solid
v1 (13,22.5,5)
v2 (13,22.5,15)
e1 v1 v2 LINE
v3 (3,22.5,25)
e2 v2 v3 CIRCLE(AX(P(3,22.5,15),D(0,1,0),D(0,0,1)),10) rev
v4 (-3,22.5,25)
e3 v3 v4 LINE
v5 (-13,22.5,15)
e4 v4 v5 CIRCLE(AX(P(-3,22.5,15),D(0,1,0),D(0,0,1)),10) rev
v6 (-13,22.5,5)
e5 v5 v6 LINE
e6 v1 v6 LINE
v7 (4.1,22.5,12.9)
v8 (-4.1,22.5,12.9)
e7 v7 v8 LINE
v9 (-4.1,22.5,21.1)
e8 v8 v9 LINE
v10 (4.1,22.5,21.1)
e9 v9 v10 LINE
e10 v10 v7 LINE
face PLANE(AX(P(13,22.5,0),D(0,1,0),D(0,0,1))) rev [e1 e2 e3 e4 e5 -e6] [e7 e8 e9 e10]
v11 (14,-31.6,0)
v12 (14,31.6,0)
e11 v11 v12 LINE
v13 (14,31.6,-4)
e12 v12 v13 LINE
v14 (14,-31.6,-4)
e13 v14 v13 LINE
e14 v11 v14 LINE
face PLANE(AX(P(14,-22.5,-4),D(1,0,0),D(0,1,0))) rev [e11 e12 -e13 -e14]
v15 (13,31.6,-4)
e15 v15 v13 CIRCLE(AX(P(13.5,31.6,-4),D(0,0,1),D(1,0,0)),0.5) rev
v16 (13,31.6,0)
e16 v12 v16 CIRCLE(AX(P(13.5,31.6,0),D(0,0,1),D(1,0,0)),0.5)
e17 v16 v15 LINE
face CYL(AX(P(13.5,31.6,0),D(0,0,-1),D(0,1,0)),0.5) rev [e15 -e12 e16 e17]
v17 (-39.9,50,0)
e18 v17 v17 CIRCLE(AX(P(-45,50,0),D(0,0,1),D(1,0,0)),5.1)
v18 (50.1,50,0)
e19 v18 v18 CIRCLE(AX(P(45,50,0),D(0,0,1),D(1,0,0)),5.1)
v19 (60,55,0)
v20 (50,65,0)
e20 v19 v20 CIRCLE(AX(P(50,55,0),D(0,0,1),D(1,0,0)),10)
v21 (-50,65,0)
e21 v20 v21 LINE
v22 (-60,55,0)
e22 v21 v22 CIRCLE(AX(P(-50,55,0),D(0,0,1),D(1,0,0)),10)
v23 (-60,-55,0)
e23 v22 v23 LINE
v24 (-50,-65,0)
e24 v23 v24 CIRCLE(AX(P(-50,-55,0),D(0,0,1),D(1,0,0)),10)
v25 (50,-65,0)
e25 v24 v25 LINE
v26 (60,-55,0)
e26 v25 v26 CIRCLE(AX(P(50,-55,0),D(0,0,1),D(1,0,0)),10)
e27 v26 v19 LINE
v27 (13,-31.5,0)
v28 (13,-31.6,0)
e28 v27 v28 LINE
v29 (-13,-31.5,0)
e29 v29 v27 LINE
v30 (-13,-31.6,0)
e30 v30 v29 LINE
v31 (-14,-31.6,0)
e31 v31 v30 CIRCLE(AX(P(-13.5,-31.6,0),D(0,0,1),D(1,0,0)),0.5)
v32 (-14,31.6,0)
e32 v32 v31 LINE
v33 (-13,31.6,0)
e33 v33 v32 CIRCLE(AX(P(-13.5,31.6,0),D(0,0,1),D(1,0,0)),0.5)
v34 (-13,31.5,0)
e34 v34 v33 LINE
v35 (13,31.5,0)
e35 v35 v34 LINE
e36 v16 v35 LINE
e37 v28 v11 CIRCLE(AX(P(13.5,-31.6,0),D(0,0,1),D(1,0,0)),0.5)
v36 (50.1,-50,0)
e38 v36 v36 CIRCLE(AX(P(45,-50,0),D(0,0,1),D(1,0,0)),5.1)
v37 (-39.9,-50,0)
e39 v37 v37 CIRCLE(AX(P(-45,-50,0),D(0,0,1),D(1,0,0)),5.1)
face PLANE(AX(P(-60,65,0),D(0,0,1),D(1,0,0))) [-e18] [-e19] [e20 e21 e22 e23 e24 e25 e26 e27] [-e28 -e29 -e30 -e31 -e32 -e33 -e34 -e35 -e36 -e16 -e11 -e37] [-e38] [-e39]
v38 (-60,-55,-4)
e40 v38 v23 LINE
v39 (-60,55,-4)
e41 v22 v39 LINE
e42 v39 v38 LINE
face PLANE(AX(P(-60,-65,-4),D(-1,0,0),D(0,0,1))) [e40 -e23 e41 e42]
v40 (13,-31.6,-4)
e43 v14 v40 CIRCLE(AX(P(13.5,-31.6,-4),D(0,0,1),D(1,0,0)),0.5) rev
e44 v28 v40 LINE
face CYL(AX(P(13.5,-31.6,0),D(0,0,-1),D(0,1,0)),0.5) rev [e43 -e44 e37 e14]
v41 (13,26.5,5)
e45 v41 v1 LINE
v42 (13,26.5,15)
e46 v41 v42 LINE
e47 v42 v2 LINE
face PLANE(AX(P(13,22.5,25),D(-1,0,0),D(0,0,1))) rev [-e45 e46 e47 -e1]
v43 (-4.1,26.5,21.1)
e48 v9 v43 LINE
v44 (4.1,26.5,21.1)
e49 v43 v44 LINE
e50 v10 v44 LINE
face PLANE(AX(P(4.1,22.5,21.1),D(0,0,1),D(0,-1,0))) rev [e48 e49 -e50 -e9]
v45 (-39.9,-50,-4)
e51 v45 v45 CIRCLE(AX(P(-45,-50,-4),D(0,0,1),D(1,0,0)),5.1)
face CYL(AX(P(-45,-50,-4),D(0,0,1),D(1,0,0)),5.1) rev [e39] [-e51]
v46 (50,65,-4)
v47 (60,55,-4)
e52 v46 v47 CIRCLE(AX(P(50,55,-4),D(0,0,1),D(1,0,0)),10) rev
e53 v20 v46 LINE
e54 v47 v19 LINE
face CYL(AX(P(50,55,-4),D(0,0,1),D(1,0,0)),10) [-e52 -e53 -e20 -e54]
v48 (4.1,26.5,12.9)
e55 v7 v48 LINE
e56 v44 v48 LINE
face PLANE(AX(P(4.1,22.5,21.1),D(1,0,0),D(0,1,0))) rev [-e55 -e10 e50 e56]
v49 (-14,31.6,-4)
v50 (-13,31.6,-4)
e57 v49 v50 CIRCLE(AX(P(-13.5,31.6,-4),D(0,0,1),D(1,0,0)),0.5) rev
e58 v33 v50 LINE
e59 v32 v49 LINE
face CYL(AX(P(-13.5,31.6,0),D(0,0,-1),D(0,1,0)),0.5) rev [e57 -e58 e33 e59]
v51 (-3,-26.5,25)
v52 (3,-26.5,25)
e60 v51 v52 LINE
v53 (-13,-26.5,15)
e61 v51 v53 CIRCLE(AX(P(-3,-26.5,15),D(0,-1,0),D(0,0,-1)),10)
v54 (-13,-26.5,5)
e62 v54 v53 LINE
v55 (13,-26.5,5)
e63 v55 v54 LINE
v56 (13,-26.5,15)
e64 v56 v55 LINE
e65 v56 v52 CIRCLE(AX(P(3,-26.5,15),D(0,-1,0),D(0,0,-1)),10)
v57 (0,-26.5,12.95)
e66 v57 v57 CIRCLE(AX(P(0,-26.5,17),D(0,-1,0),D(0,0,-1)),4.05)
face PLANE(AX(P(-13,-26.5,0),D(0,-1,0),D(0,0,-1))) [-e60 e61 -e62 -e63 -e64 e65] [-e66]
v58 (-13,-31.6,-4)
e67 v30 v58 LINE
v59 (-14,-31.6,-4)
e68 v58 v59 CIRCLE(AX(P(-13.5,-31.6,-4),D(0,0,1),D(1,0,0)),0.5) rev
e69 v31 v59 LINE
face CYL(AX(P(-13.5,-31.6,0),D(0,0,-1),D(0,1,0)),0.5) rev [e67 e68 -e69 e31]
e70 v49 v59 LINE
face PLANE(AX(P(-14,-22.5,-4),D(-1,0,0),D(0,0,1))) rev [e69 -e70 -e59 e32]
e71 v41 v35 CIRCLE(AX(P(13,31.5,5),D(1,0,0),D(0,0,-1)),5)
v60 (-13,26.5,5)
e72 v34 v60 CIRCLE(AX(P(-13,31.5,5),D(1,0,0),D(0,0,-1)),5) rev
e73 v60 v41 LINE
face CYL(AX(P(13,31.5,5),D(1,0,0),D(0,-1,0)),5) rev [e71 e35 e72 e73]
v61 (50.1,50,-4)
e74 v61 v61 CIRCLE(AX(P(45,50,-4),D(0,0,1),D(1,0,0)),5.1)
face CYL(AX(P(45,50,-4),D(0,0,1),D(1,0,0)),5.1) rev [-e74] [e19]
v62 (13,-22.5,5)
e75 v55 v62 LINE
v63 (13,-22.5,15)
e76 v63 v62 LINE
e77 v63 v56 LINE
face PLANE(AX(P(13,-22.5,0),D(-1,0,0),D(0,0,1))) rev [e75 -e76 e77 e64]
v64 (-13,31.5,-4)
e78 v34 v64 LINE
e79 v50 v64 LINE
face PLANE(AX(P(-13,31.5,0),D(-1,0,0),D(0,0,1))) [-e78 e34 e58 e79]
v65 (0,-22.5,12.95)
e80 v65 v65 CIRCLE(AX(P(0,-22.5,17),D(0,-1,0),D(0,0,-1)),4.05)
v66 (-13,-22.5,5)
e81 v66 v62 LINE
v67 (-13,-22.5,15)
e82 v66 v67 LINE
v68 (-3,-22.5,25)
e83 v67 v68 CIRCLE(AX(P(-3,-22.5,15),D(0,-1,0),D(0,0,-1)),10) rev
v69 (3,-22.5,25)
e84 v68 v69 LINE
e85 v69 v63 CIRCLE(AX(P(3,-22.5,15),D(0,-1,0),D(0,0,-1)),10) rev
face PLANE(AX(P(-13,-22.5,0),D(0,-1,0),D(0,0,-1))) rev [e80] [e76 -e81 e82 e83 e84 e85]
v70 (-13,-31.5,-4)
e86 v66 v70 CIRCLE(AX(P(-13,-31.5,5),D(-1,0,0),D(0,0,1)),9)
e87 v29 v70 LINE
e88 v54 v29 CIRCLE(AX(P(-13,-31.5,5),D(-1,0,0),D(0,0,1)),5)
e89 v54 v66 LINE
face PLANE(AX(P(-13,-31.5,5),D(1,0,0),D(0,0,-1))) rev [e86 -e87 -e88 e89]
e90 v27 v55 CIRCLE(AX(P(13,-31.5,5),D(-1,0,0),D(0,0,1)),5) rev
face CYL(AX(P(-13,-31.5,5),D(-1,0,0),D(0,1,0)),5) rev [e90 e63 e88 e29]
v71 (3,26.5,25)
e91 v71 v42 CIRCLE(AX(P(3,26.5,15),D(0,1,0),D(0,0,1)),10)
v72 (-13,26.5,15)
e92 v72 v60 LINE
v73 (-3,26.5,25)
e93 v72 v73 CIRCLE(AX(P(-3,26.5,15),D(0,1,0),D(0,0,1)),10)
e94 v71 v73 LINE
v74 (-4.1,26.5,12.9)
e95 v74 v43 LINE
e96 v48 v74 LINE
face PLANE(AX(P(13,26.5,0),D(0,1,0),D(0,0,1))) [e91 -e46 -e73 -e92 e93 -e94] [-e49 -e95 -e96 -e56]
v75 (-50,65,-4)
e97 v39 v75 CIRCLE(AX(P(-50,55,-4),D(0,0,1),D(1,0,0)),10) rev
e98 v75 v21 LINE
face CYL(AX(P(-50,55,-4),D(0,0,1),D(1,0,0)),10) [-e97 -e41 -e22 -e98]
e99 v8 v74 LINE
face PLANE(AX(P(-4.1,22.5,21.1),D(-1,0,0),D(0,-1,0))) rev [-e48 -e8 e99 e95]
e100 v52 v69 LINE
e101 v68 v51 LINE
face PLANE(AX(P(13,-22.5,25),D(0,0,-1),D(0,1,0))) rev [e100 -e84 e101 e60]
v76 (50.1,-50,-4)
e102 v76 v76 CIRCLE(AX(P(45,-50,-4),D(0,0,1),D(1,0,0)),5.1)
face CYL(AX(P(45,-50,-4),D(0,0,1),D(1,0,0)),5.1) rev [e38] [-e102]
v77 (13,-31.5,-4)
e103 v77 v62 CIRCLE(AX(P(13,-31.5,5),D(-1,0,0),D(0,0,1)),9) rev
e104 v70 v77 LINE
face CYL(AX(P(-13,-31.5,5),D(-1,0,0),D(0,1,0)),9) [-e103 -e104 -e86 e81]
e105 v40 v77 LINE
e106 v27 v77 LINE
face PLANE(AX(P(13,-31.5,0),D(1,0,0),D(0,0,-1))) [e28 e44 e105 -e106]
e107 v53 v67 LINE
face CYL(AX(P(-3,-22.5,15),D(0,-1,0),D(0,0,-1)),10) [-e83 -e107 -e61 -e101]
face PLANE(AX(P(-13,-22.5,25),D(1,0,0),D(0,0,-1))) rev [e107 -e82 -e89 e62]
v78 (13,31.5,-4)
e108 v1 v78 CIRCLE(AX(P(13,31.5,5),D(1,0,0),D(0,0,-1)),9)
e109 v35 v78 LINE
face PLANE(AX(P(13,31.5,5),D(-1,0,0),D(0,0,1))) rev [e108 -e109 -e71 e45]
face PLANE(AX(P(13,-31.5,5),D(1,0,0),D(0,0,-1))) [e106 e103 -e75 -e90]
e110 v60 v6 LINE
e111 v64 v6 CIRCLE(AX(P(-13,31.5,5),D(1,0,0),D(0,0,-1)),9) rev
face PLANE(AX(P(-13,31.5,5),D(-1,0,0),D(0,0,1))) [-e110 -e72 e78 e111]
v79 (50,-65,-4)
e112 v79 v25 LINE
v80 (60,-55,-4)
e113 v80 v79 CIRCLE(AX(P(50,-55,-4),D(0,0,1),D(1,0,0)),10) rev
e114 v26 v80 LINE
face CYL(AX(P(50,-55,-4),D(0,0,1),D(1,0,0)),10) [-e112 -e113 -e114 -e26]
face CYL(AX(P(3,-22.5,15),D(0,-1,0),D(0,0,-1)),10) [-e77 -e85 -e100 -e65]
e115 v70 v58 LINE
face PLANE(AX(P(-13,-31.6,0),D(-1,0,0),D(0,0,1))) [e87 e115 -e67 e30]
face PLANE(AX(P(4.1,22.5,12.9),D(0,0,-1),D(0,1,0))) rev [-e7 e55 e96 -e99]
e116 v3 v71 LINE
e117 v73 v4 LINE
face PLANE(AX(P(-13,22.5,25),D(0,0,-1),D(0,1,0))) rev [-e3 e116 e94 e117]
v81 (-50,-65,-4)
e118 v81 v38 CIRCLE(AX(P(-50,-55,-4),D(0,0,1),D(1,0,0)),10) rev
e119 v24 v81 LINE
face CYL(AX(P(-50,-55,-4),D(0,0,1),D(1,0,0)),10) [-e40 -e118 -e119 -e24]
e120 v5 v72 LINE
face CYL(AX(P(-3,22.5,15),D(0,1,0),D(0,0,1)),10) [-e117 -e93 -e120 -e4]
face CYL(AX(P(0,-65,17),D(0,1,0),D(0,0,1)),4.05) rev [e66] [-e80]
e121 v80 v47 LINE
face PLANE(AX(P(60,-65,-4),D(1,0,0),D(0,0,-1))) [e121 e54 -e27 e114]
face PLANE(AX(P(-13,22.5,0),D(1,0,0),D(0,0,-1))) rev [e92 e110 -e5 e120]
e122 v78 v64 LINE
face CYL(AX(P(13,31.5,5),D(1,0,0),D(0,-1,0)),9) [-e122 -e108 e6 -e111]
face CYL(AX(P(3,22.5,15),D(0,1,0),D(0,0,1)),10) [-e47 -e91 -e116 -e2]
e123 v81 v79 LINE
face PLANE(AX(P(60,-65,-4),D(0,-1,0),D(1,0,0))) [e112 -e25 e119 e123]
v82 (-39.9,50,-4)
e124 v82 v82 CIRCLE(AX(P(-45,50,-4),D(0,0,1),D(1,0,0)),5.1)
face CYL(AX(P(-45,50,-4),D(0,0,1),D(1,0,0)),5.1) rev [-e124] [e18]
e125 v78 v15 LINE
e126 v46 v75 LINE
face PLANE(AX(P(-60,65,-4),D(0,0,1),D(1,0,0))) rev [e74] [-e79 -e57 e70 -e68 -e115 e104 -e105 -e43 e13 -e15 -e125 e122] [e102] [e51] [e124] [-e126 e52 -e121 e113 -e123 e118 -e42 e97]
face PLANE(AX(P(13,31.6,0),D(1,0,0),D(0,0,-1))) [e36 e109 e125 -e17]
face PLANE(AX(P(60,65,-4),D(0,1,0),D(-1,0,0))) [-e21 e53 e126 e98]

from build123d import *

# Parameters (mm, degrees)
SKETCH_1_W                   = 120
SKETCH_1_H                   = 130
SKETCH_1_W_2                 = 28
SKETCH_1_H_2                 = 45
SM_BASE_FLANGE_1_DEPTH       = 4
SM_START                     = -4
SM_EDGE_FLANGE_1_DEPTH       = 4
SM_EDGE_FLANGE_1_2_OUTLINE_W = 26
SM_EDGE_FLANGE_1_2_OUTLINE_H = 4
SM_EDGE_FLANGE_1_2_DEPTH     = 0.41096
SM_START_2                   = 5
SM_EDGE_FLANGE_1_3_OUTLINE_W = 26
SM_EDGE_FLANGE_1_3_OUTLINE_H = 4
SM_EDGE_FLANGE_1_3_DEPTH     = 20
SM_START_3                   = -13
SM_EDGE_FLANGE_1_4_DEPTH     = 26
SM_EDGE_FLANGE_1_5_DEPTH     = 26
CUT_EXTRUDE_1_DEPTH          = 92.923881554
CUT_EXTRUDE_1_DEPTH_BACK     = 92.923881554
SKETCH_10_R                  = 4.05
SKETCH_12_W                  = 8.2
SKETCH_12_H                  = 8.2
CUT_EXTRUDE_3_DEPTH          = 4
FILLET_1_R                   = 10
SKETCH_11_R                  = 5.1
CUT_EXTRUDE_2_DEPTH          = 4


with BuildPart() as part:
    # Базовая кромка1: sheet metal written as solids
    # Sketch 1 → Базовая кромка1 (new body)
    with BuildSketch(Plane.XY):
        Rectangle(SKETCH_1_W, SKETCH_1_H)
        Rectangle(SKETCH_1_W_2, SKETCH_1_H_2, mode=Mode.SUBTRACT)
    extrude(amount=-SM_BASE_FLANGE_1_DEPTH)

    # Ребро-кромка1: read off the stored shape, not the designer's step
    # Ребро-кромка1 outline → Ребро-кромка1 (cut)
    with BuildSketch(Plane.XY.offset(SM_START)):
        with BuildLine():
            ThreePointArc((-13, 31.6), (-13.5, 32.1), (-14, 31.6))
            Line((-14, 31.6), (-14, 22.5))
            Line((-14, 22.5), (-13, 22.5))
            Line((-13, 22.5), (-13, 31.6))
        make_face()
        with BuildLine():
            Line((-13, -22.5), (-14, -22.5))
            Line((-14, -22.5), (-14, -31.6))
            ThreePointArc((-14, -31.6), (-13.5, -32.1), (-13, -31.6))
            Line((-13, -31.6), (-13, -22.5))
        make_face()
        with BuildLine():
            Line((13, 31.6), (13, 22.5))
            Line((13, 22.5), (14, 22.5))
            Line((14, 22.5), (14, 31.6))
            ThreePointArc((14, 31.6), (13.5, 32.1), (13, 31.6))
        make_face()
        with BuildLine():
            Line((14, -22.5), (13, -22.5))
            Line((13, -22.5), (13, -31.6))
            ThreePointArc((13, -31.6), (13.5, -32.1), (14, -31.6))
            Line((14, -31.6), (14, -22.5))
        make_face()
    extrude(amount=SM_EDGE_FLANGE_1_DEPTH, mode=Mode.SUBTRACT)

    # Sm Edge Flange 1 2 outline → Sm Edge Flange 1 2 (cut)
    with BuildSketch(Plane.XY.offset(SM_START)):
        with Locations((0, 24.5)):
            Rectangle(SM_EDGE_FLANGE_1_2_OUTLINE_W, SM_EDGE_FLANGE_1_2_OUTLINE_H)
        with Locations((0, -24.5)):
            Rectangle(SM_EDGE_FLANGE_1_2_OUTLINE_W, SM_EDGE_FLANGE_1_2_OUTLINE_H)
    extrude(amount=SM_EDGE_FLANGE_1_2_DEPTH, mode=Mode.SUBTRACT)

    # Sm Edge Flange 1 4 outline → Sm Edge Flange 1 4 (cut)
    with BuildSketch(Plane.YZ.offset(SM_START_3)):
        with BuildLine():
            ThreePointArc((31.5, -4), (27.257359313, -2.937253933), (24.016685226, 0))
            Line((24.016685226, 0), (22.5, 0))
            Line((22.5, 0), (22.5, -3.58904))
            Line((22.5, -3.58904), (26.5, -3.58904))
            Line((26.5, -3.58904), (26.5, -4))
            Line((26.5, -4), (31.5, -4))
        make_face()
        with BuildLine():
            Line((-22.5, -3.58904), (-22.5, 0))
            Line((-22.5, 0), (-24.016685226, 0))
            ThreePointArc((-24.016685226, 0), (-27.257359313, -2.937253933), (-31.5, -4))
            Line((-31.5, -4), (-26.5, -4))
            Line((-26.5, -4), (-26.5, -3.58904))
            Line((-26.5, -3.58904), (-22.5, -3.58904))
        make_face()
    extrude(amount=SM_EDGE_FLANGE_1_4_DEPTH, mode=Mode.SUBTRACT)



with BuildPart() as body_2:
    # Sm Edge Flange 1 3 outline → Sm Edge Flange 1 3 (new body)
    with BuildSketch(Plane.XY.offset(SM_START_2)):
        with Locations((0, 24.5)):
            Rectangle(SM_EDGE_FLANGE_1_3_OUTLINE_W, SM_EDGE_FLANGE_1_3_OUTLINE_H)
        with Locations((0, -24.5)):
            Rectangle(SM_EDGE_FLANGE_1_3_OUTLINE_W, SM_EDGE_FLANGE_1_3_OUTLINE_H)
    extrude(amount=SM_EDGE_FLANGE_1_3_DEPTH)


with BuildPart() as part_1:
    add(part.part)

    add(body_2.part)  # Sm Edge Flange 1 5 merges body 2
    # Sm Edge Flange 1 5 outline → Sm Edge Flange 1 5 (add)
    with BuildSketch(Plane.YZ.offset(SM_START_3)):
        with BuildLine():
            Line((26.5, 5), (22.5, 5))
            ThreePointArc((22.5, 5), (22.88751392, 2.38751392), (24.016685226, 0))
            Line((24.016685226, 0), (31.5, 0))
            ThreePointArc((31.5, 0), (27.964466094, 1.464466094), (26.5, 5))
        make_face()
        with BuildLine():
            Line((-31.5, 0), (-24.016685226, 0))
            ThreePointArc((-24.016685226, 0), (-22.88751392, 2.38751392), (-22.5, 5))
            Line((-22.5, 5), (-26.5, 5))
            ThreePointArc((-26.5, 5), (-27.964466094, 1.464466094), (-31.5, 0))
        make_face()
    extrude(amount=SM_EDGE_FLANGE_1_5_DEPTH)

    # Эскиз10 → Вырез-Вытянуть1 (cut, two sides: drawn at the far end of the back side and taken through both)
    with BuildSketch(Plane(origin=(0, 0, 0), x_dir=(1, 0, 0), z_dir=(0, 1, 0)).offset(-CUT_EXTRUDE_1_DEPTH_BACK)):
        with Locations(Location((0, -17, 0), (0, 0, 90))):
            Circle(SKETCH_10_R)
    extrude(amount=CUT_EXTRUDE_1_DEPTH + CUT_EXTRUDE_1_DEPTH_BACK, mode=Mode.SUBTRACT)

    # Эскиз12 → Вырез-Вытянуть3 (cut)
    with BuildSketch(Plane(origin=(0, 26.5, 0), x_dir=(1, 0, 0), z_dir=(0, 1, 0))):
        with Locations((0, -17)):
            Rectangle(SKETCH_12_W, SKETCH_12_H)
    extrude(amount=-CUT_EXTRUDE_3_DEPTH, mode=Mode.SUBTRACT)

    # Скругление1
    fillet_1_edges = [part_1.edges().sort_by_distance(p)[0] for p in [
        (13, -24.5, 25),
        (-13, -24.5, 25),
        (-60, 65, -2),
        (60, 65, -2),
        (60, -65, -2),
        (-60, -65, -2),
        (-13, 24.5, 25),
        (13, 24.5, 25),
    ]]
    fillet(fillet_1_edges, radius=FILLET_1_R)

    # Эскиз11 → Вырез-Вытянуть2 (cut)
    with BuildSketch(Plane.XY):
        with Locations((-45, 50)):
            Circle(SKETCH_11_R)
        with Locations((45, 50)):
            Circle(SKETCH_11_R)
        with Locations((-45, -50)):
            Circle(SKETCH_11_R)
        with Locations((45, -50)):
            Circle(SKETCH_11_R)
    extrude(amount=-CUT_EXTRUDE_2_DEPTH, mode=Mode.SUBTRACT)


solid = part_1.part
